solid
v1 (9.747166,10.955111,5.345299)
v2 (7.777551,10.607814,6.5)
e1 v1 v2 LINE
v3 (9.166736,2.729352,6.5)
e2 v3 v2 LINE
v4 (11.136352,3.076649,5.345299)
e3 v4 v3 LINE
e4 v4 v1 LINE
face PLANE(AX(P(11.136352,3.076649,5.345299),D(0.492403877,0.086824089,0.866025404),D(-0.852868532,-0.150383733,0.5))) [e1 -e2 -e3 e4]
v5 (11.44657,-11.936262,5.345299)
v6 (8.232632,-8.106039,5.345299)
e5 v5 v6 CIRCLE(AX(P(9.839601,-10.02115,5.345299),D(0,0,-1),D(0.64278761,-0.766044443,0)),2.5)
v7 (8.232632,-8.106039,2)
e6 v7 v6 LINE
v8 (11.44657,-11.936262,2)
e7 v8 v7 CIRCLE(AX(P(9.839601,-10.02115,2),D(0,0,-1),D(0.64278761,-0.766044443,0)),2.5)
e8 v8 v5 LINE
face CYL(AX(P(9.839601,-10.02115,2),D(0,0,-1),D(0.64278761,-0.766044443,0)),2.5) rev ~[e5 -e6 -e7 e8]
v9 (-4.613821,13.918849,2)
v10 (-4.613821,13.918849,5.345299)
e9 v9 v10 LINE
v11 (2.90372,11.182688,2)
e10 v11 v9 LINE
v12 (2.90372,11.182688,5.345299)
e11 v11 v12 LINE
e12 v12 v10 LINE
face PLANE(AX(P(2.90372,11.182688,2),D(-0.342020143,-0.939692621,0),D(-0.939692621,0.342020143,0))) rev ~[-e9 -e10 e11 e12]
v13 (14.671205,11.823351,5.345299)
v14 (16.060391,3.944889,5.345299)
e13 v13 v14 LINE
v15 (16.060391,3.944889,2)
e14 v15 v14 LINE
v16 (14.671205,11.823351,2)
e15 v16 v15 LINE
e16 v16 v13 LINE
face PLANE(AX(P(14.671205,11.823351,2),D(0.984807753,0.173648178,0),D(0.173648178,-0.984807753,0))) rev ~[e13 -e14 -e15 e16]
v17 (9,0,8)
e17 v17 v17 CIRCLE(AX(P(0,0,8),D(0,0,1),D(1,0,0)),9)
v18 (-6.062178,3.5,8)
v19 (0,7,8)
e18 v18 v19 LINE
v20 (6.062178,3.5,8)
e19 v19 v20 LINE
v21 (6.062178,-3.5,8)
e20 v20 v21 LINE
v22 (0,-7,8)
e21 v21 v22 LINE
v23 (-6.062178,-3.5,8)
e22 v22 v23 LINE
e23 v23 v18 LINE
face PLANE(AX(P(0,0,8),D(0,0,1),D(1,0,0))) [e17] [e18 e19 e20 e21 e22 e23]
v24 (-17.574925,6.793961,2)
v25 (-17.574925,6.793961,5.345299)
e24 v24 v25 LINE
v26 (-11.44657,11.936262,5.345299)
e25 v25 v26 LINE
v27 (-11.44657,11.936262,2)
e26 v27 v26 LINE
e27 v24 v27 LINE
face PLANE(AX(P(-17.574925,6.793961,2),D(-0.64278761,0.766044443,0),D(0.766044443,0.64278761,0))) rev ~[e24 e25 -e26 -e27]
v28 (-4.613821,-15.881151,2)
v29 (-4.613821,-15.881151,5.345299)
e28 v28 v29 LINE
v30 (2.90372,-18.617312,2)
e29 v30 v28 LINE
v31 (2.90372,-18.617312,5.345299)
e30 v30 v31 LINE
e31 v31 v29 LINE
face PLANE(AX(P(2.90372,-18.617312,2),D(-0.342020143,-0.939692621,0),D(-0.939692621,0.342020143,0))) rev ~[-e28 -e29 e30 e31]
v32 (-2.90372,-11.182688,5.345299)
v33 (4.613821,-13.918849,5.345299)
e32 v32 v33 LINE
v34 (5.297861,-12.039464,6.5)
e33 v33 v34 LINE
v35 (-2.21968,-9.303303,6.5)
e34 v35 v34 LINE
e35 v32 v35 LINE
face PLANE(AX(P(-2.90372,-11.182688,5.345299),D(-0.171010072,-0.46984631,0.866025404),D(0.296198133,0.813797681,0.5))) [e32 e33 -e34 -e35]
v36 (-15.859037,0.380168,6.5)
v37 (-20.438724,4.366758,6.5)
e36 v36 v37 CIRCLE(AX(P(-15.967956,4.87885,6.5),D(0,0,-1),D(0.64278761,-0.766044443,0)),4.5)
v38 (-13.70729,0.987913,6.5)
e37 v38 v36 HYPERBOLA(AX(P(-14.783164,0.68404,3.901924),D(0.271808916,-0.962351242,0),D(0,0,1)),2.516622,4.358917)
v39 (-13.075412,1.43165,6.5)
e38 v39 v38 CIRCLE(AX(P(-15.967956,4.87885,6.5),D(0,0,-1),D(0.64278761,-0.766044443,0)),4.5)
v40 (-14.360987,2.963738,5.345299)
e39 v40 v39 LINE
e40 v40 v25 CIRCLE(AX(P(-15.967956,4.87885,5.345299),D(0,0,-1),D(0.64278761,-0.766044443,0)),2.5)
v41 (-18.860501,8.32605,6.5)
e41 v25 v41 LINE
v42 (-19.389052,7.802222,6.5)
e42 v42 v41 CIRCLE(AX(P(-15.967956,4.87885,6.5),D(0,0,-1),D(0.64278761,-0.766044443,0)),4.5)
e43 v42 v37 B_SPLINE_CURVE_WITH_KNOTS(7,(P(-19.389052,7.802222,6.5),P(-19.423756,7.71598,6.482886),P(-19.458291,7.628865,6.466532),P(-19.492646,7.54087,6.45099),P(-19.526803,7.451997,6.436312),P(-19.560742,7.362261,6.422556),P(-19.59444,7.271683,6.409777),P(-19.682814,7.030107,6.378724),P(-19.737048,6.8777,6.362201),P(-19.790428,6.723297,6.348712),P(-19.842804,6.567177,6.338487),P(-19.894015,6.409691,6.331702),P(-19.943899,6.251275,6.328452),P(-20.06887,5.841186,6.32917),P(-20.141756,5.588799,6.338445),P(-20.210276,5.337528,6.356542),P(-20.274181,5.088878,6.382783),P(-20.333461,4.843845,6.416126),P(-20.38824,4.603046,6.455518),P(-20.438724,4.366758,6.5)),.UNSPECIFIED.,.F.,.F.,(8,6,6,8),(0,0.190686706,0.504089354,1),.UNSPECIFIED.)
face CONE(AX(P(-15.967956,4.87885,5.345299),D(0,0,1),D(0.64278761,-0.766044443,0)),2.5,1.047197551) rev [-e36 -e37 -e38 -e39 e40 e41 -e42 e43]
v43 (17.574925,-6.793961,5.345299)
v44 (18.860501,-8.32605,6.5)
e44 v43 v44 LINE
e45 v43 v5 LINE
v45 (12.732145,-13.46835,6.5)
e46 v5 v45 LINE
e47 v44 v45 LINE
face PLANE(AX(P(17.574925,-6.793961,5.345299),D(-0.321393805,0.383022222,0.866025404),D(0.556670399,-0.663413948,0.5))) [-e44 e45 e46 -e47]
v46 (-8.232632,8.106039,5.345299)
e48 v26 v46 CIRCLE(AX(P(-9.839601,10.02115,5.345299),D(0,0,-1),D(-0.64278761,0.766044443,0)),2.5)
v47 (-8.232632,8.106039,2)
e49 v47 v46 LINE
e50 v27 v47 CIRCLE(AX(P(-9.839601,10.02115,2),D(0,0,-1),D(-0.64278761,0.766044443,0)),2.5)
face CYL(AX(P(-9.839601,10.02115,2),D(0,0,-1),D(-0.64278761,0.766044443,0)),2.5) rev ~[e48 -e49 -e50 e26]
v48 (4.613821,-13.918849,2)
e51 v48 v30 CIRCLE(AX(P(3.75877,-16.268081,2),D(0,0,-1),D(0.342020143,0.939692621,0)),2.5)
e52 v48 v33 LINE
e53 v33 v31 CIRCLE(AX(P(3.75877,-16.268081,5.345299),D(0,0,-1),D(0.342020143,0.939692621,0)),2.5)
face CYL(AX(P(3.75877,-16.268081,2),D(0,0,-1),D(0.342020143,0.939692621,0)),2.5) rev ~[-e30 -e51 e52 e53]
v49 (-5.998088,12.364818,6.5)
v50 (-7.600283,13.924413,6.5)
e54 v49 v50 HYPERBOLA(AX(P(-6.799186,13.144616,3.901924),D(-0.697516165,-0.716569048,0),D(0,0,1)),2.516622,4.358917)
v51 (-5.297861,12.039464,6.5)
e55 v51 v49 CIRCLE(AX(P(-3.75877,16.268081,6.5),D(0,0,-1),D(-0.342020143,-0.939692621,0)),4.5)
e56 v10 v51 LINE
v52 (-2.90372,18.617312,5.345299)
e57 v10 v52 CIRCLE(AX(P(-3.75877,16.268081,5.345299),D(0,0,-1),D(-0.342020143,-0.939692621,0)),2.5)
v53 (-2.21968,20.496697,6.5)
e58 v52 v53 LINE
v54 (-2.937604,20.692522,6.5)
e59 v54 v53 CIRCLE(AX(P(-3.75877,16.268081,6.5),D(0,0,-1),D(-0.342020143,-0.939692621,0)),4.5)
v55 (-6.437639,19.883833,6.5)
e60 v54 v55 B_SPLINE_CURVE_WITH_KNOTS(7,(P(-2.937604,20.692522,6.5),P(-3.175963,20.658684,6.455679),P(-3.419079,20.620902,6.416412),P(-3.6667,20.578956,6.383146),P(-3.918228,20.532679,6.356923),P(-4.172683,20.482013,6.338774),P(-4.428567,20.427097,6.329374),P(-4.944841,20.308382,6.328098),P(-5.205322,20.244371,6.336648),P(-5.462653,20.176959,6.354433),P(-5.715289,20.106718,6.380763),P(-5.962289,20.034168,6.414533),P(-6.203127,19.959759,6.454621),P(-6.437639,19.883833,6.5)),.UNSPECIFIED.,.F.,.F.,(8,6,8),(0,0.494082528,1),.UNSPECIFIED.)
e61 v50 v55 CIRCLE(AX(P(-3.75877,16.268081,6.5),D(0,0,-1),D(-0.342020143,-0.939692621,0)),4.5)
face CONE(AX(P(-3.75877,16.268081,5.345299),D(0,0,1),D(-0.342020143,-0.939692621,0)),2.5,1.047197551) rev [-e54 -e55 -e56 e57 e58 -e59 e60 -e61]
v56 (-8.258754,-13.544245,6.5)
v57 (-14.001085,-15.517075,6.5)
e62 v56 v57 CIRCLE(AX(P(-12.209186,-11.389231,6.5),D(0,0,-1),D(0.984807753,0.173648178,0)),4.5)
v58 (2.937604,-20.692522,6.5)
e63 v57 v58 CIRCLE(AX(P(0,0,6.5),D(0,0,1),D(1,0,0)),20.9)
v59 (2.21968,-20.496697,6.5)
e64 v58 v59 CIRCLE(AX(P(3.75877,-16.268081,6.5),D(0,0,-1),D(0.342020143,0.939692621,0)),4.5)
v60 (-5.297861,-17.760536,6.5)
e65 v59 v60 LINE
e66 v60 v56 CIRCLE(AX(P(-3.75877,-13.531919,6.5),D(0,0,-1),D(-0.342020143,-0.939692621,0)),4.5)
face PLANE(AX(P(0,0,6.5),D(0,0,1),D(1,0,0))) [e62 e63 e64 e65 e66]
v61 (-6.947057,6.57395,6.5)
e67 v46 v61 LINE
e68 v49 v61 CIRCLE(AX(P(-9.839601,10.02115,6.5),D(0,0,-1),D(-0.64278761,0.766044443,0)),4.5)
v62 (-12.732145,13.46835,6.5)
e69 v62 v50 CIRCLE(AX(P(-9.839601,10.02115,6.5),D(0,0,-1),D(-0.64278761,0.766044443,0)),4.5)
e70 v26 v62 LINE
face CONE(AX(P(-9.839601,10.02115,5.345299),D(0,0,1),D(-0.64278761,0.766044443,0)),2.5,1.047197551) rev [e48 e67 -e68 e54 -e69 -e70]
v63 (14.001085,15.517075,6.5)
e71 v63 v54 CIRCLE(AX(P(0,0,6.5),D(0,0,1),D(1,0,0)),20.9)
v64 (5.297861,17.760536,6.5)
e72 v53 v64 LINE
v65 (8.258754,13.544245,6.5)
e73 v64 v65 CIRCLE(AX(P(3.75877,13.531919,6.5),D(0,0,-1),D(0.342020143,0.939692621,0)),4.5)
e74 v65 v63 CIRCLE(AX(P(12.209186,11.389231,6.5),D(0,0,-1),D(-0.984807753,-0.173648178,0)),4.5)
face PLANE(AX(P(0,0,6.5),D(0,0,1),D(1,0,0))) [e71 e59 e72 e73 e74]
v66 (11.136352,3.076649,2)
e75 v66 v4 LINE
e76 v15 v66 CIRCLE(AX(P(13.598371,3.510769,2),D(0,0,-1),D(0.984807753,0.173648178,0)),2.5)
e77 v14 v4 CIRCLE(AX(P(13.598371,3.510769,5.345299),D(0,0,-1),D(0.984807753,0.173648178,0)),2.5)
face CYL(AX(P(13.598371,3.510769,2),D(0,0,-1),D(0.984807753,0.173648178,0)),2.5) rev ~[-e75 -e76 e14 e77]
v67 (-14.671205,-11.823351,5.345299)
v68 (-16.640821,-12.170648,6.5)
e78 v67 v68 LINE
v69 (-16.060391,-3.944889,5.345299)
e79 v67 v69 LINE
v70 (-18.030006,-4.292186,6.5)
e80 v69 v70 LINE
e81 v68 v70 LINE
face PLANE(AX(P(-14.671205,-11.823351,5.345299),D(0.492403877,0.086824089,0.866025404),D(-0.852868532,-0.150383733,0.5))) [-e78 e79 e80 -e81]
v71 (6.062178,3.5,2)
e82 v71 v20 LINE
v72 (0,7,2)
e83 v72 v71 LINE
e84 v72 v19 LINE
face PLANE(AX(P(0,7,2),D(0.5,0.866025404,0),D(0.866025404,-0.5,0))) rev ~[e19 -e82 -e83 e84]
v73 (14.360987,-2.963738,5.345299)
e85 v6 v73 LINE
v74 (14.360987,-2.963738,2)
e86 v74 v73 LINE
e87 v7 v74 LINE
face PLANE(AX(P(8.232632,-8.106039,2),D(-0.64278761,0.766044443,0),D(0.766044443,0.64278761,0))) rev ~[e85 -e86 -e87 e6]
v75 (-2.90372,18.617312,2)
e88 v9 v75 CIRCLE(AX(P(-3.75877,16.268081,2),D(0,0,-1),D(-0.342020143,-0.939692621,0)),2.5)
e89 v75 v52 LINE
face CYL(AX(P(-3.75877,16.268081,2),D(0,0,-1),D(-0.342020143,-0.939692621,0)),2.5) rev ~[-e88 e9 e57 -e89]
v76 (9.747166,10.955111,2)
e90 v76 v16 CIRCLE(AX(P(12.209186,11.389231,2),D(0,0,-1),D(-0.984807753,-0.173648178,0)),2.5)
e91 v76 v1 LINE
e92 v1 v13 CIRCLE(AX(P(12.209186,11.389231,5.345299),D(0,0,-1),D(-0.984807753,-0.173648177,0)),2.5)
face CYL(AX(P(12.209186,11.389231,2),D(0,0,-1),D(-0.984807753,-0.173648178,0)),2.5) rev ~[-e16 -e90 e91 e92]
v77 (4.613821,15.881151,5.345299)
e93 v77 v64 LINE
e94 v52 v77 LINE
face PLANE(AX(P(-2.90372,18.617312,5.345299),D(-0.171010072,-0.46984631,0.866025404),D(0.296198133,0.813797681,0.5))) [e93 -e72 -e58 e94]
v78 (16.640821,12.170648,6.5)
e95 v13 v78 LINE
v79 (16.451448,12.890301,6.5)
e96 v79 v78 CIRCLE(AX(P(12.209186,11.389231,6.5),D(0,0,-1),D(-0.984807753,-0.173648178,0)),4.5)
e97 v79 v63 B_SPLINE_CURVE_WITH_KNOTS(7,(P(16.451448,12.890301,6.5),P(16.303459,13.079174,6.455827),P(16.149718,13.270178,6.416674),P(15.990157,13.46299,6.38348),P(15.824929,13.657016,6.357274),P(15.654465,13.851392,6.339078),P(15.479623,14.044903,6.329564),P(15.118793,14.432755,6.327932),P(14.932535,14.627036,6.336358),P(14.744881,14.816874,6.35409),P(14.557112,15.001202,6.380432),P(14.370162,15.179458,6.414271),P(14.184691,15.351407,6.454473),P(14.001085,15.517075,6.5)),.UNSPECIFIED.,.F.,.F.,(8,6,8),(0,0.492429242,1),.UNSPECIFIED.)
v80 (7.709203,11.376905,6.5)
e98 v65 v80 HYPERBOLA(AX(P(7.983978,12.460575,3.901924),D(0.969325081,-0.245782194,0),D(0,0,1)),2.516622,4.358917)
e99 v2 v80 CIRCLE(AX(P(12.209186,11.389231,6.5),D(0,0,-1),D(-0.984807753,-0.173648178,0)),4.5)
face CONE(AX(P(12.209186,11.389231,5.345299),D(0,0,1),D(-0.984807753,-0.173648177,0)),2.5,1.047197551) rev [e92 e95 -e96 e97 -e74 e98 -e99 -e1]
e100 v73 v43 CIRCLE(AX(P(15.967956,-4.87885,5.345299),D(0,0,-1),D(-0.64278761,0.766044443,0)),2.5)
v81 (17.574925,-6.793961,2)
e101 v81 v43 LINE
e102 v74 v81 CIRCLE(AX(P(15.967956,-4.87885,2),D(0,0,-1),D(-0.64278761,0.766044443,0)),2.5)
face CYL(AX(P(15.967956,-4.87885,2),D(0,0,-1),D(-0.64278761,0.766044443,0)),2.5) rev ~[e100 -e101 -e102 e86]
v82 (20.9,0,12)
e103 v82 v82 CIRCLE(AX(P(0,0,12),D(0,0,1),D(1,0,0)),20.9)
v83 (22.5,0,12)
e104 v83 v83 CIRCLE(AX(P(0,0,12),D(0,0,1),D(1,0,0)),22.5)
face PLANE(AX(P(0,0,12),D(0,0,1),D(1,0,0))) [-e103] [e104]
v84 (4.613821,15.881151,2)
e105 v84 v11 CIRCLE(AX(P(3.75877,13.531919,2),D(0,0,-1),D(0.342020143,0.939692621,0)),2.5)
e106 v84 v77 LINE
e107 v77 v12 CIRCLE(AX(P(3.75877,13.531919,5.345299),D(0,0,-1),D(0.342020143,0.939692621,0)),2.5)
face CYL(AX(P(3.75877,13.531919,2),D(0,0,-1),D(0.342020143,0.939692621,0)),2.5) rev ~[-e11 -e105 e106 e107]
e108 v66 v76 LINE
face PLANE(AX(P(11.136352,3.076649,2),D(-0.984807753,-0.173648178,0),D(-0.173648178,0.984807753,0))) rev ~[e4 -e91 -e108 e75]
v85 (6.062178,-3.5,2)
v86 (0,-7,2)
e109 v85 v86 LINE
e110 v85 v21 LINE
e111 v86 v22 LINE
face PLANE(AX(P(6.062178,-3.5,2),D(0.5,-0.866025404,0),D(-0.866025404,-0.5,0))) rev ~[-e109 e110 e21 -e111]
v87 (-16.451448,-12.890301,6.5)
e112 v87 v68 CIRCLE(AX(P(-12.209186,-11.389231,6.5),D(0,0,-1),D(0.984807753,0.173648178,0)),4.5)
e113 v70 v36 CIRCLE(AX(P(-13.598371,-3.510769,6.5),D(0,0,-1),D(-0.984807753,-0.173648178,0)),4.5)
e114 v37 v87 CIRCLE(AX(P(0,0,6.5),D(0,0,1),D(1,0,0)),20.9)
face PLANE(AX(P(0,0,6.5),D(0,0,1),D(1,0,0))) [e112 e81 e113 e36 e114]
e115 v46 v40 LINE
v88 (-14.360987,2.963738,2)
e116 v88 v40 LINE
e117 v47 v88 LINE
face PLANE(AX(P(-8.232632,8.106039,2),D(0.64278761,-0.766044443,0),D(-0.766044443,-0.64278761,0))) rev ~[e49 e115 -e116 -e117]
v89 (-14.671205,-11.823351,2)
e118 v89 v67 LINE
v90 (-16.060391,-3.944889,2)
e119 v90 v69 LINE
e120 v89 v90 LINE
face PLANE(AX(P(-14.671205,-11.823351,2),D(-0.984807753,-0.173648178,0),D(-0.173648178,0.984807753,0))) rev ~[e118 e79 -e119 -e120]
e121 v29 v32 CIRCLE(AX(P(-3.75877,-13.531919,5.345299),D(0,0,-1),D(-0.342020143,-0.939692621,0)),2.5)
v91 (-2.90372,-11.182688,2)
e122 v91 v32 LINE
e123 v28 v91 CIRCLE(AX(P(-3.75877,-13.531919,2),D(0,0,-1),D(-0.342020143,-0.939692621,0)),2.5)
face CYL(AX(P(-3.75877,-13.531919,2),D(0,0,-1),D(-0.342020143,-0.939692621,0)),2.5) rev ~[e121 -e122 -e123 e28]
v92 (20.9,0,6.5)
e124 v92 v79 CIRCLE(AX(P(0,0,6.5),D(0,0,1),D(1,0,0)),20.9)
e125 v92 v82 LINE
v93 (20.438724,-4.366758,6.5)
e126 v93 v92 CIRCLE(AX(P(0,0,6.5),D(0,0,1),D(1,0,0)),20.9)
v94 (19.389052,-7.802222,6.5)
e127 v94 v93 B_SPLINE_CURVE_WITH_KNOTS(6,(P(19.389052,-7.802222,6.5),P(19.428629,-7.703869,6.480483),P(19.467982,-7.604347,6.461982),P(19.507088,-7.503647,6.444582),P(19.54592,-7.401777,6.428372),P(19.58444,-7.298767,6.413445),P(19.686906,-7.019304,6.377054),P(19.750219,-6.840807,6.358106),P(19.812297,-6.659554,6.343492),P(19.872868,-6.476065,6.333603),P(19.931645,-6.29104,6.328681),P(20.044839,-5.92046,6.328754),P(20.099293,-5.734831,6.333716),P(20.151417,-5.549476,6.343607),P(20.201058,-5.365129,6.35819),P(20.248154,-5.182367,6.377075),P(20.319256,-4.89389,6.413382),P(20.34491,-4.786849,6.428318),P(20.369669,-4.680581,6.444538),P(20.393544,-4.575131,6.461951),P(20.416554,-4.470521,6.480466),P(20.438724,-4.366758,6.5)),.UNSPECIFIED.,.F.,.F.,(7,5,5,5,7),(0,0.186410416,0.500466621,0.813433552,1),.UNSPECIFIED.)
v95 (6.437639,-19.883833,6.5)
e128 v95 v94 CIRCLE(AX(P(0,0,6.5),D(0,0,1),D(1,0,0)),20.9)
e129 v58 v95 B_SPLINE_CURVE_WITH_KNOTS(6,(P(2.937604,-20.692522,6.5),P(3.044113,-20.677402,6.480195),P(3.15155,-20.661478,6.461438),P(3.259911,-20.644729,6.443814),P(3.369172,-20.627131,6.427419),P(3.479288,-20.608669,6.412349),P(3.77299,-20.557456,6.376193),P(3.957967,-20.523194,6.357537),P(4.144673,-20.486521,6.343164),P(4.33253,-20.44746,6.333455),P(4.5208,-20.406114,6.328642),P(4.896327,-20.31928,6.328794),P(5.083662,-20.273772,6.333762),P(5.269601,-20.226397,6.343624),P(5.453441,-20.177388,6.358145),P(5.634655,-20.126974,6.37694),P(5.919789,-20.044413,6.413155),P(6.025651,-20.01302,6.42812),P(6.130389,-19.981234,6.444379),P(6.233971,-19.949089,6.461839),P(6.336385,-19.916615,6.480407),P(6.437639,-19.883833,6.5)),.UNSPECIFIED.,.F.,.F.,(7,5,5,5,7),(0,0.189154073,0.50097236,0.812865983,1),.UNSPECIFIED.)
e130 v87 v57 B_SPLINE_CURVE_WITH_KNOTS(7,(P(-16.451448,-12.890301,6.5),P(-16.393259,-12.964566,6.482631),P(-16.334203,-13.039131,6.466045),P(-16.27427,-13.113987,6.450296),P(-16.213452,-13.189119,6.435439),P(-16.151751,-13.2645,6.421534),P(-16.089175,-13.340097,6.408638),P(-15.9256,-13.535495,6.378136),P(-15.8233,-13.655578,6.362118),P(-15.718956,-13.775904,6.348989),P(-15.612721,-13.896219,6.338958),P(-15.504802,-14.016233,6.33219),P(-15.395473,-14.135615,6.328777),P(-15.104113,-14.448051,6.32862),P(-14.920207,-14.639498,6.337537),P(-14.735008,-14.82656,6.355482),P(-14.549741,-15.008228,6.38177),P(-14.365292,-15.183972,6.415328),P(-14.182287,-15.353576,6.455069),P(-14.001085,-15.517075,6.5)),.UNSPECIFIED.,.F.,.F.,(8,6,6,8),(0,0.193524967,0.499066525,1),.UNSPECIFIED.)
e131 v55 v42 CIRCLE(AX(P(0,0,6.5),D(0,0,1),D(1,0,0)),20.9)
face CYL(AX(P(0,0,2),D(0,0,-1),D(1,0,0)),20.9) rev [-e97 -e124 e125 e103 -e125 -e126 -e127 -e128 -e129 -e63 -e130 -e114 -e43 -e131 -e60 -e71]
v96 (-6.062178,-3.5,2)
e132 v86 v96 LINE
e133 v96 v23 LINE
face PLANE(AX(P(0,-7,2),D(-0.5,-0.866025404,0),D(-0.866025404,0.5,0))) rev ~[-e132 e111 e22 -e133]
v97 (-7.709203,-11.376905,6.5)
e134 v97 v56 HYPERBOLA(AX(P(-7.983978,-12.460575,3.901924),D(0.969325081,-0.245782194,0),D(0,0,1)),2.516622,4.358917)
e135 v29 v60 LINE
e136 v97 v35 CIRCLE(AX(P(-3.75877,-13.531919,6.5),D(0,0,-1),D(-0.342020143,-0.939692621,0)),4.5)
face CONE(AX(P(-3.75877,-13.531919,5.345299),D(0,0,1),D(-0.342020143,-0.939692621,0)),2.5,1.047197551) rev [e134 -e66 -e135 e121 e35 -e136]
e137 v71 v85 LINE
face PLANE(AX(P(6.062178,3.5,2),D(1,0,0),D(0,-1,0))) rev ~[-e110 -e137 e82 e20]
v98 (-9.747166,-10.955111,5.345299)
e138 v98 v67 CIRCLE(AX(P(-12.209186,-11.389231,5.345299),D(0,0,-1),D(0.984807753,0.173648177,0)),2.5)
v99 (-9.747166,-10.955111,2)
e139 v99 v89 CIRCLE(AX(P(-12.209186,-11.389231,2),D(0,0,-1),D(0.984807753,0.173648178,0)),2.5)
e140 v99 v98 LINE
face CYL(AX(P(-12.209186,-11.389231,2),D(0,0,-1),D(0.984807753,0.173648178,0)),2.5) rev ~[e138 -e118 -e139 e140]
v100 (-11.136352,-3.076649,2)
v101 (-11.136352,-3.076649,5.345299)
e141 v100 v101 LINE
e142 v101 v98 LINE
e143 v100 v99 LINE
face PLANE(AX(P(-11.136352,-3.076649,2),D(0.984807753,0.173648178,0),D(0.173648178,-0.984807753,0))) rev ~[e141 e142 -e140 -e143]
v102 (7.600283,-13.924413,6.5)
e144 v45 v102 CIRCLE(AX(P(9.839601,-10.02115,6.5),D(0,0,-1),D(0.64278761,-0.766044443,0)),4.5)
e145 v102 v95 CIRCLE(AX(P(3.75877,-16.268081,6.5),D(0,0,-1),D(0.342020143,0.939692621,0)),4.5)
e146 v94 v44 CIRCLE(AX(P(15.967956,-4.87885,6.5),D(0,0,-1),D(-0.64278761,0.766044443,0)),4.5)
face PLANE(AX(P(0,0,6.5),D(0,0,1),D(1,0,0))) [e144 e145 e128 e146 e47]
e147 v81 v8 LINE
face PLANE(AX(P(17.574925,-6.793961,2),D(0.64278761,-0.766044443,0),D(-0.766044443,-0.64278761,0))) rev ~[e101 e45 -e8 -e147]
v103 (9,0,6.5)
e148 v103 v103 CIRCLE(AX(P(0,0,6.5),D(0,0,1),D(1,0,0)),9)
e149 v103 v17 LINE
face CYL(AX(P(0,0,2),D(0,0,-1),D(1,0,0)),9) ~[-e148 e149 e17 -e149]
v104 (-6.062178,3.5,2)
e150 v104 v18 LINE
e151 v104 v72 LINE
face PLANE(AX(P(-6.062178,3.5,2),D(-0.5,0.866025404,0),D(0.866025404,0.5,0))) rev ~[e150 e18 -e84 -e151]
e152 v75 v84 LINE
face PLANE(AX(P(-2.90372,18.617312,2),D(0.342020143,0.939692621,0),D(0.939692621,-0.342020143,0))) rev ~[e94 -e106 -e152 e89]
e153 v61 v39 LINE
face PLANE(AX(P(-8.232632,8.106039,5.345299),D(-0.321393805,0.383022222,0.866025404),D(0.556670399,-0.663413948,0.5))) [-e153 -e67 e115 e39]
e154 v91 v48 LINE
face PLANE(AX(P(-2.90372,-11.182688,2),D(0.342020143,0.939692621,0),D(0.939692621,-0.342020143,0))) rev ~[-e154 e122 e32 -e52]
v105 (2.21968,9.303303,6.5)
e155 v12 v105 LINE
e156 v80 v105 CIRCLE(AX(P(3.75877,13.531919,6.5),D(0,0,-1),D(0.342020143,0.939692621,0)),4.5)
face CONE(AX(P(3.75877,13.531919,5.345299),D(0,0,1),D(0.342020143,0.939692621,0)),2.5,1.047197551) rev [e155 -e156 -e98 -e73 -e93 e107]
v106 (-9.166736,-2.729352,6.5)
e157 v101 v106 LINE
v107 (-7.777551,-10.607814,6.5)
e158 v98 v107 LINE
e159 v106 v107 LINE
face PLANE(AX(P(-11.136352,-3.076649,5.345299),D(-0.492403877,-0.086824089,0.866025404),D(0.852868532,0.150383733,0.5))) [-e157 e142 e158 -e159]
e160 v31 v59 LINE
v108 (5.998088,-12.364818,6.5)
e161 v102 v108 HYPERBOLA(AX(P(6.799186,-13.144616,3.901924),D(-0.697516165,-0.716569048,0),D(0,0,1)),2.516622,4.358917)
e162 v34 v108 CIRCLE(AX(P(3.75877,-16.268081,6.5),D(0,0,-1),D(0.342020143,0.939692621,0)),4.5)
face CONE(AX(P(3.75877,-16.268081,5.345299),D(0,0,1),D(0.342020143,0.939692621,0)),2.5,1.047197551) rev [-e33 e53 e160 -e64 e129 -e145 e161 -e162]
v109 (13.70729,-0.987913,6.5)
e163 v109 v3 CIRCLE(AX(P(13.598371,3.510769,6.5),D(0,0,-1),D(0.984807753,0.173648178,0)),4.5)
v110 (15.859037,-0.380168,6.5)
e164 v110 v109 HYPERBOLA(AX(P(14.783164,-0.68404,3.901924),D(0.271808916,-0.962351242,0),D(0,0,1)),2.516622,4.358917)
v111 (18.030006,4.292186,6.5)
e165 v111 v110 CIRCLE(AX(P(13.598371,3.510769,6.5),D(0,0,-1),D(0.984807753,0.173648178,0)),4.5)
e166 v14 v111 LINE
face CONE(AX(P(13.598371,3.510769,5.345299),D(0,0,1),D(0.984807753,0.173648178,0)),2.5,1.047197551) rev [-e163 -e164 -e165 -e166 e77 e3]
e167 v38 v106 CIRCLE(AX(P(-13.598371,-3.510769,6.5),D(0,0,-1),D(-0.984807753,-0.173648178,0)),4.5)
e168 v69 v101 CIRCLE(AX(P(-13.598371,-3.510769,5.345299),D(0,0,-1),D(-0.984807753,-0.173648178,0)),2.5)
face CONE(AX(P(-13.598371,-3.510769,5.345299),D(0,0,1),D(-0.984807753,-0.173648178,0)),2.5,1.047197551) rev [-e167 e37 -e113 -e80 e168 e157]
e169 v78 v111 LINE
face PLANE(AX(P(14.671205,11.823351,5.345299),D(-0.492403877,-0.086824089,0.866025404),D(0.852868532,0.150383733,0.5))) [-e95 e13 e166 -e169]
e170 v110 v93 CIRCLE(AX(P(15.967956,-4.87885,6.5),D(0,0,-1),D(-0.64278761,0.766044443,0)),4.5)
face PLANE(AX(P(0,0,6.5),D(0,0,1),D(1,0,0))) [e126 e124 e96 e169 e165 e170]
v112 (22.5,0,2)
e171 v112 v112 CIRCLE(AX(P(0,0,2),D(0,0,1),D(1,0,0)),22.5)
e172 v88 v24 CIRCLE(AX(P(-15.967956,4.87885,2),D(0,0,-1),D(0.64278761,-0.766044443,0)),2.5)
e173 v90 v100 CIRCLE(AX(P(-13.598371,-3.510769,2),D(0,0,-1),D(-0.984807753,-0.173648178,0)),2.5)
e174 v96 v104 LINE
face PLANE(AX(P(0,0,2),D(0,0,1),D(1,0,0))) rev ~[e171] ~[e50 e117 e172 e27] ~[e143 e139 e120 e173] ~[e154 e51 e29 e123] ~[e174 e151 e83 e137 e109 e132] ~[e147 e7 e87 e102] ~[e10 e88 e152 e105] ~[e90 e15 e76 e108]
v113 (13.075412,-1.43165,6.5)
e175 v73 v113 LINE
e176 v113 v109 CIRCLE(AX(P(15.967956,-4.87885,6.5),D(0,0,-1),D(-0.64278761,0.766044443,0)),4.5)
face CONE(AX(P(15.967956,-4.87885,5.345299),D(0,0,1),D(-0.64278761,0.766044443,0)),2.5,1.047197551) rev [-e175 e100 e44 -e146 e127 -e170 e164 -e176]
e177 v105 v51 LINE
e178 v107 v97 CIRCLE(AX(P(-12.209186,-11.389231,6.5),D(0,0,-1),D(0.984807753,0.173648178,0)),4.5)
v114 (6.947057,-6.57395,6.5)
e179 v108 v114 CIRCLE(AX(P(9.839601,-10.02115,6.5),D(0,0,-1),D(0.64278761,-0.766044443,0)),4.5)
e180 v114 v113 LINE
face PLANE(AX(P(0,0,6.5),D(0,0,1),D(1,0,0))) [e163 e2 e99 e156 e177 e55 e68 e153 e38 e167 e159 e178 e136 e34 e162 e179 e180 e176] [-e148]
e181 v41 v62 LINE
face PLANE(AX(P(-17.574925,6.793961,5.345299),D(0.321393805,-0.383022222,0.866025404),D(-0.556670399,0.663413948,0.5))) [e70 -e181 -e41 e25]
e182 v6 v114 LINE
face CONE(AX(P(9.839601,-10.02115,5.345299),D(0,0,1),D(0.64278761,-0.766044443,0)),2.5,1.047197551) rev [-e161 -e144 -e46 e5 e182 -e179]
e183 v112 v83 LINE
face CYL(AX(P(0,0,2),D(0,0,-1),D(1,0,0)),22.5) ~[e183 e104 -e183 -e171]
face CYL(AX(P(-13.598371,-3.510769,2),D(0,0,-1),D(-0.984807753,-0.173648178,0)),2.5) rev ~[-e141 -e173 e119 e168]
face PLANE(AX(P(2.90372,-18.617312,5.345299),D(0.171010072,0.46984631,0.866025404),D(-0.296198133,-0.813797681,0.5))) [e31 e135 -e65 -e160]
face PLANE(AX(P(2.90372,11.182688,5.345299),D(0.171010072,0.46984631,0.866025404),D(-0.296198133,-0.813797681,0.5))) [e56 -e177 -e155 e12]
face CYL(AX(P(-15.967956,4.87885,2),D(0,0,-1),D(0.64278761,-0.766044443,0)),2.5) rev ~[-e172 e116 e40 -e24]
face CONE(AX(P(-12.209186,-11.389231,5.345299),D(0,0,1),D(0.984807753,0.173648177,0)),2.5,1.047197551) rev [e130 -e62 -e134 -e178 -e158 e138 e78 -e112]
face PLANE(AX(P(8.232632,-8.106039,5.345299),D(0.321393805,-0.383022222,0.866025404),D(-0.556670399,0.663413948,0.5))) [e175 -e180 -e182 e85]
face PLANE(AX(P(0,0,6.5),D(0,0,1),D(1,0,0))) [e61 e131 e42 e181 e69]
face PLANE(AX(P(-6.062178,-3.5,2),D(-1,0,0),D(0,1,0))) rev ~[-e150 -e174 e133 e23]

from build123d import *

# Parameters (mm, degrees)
F1_START     = 2
F0_R         = 20.9
F0_R_2       = 9
F1_DEPTH     = 4.5
F2_START     = 2
F0_R_3       = 8
F2_DEPTH     = 6
F3_START     = 2
F3_DEPTH     = 6
F4_START     = 2
F0_R_4       = 22.5
F4_DEPTH     = 10
F5_T1_DEPTH  = 8
F5_T3_DEPTH  = 8
F5_T5_DEPTH  = 8
F5_T7_DEPTH  = 8
F5_T9_DEPTH  = 8
F5_T11_DEPTH = 8
F5_T13_DEPTH = 8
F5_T15_DEPTH = 8
F5_T17_DEPTH = 8
F5_T19_DEPTH = 8
F5_T21_DEPTH = 8
F5_T23_DEPTH = 8
F5_T26_ANGLE = 180
F5_T30_ANGLE = 180
F5_S31_R     = 20.9
F5_T32_DEPTH = 7
F5_T34_ANGLE = 180
F5_T38_ANGLE = 180
F5_S39_R     = 20.9
F5_T40_DEPTH = 7
F5_T44_ANGLE = 180
F5_S45_R     = 20.9
F5_T46_DEPTH = 7
F5_T48_ANGLE = 180
F5_T52_ANGLE = 180
F5_S53_R     = 20.9
F5_T54_DEPTH = 7
F5_T56_ANGLE = 180
F5_T60_ANGLE = 180
F5_S61_R     = 20.9
F5_T62_DEPTH = 7
F5_T64_ANGLE = 180
F5_T66_ANGLE = 180
F5_T70_ANGLE = 180
F5_S71_R     = 20.9
F5_T72_DEPTH = 7


# Not quite as in the source:
# - a fillet or chamfer that OpenCascade refuses, or shapes differently, is made with other operations: its cross-section is extruded or revolved along the edge and cut away or added
# - a feature names something its author has since deleted; it is built from what else it names


with BuildPart() as f1:
    # F0 (on Top) → F1 (new body)
    with BuildSketch(Plane.XY.offset(F1_START)):
        Circle(F0_R)
        with BuildLine():
            ThreePointArc((4.6138208415, -13.9188490213), (6.1080020351, -17.1231309316), (2.9037201248, -18.6173121253))
            Line((2.9037201248, -18.6173121253), (-4.6138208415, -15.8811509787))
            ThreePointArc((-4.6138208415, -15.8811509787), (-6.1080020351, -12.6768690684), (-2.9037201248, -11.1826878747))
            Line((-2.9037201248, -11.1826878747), (4.6138208415, -13.9188490213))
        make_face(mode=Mode.SUBTRACT)
        with BuildLine():
            ThreePointArc((-9.7471664232, -10.9551105679), (-11.7750653616, -13.8512503946), (-14.6712051883, -11.8233514562))
            Line((-14.6712051883, -11.8233514562), (-16.0603906096, -3.9448894321))
            ThreePointArc((-16.0603906096, -3.9448894321), (-14.0324916712, -1.0487496054), (-11.1363518445, -3.0766485438))
            Line((-11.1363518445, -3.0766485438), (-9.7471664232, -10.9551105679))
        make_face(mode=Mode.SUBTRACT)
        with BuildLine():
            ThreePointArc((14.3609872646, -2.9637384535), (17.8830673967, -3.271880537), (17.5749253131, -6.7939606691))
            Line((17.5749253131, -6.7939606691), (11.4465697681, -11.9362615465))
            ThreePointArc((11.4465697681, -11.9362615465), (7.9244896361, -11.628119463), (8.2326317197, -8.1060393309))
            Line((8.2326317197, -8.1060393309), (14.3609872646, -2.9637384535))
        make_face(mode=Mode.SUBTRACT)
        with BuildLine():
            ThreePointArc((-14.3609872646, 2.9637384535), (-17.8830673967, 3.271880537), (-17.5749253131, 6.7939606691))
            Line((-17.5749253131, 6.7939606691), (-11.4465697681, 11.9362615465))
            ThreePointArc((-11.4465697681, 11.9362615465), (-7.9244896361, 11.628119463), (-8.2326317197, 8.1060393309))
            Line((-8.2326317197, 8.1060393309), (-14.3609872646, 2.9637384535))
        make_face(mode=Mode.SUBTRACT)
        Circle(F0_R_2, mode=Mode.SUBTRACT)
        with BuildLine():
            ThreePointArc((9.7471664232, 10.9551105679), (11.7750653616, 13.8512503946), (14.6712051883, 11.8233514562))
            Line((14.6712051883, 11.8233514562), (16.0603906096, 3.9448894321))
            ThreePointArc((16.0603906096, 3.9448894321), (14.0324916712, 1.0487496054), (11.1363518445, 3.0766485438))
            Line((11.1363518445, 3.0766485438), (9.7471664232, 10.9551105679))
        make_face(mode=Mode.SUBTRACT)
        with BuildLine():
            ThreePointArc((-4.6138208415, 13.9188490213), (-6.1080020351, 17.1231309316), (-2.9037201248, 18.6173121253))
            Line((-2.9037201248, 18.6173121253), (4.6138208415, 15.8811509787))
            ThreePointArc((4.6138208415, 15.8811509787), (6.1080020351, 12.6768690684), (2.9037201248, 11.1826878747))
            Line((2.9037201248, 11.1826878747), (-4.6138208415, 13.9188490213))
        make_face(mode=Mode.SUBTRACT)
    extrude(amount=F1_DEPTH)

    # F0 (on Top) → F2 (join)
    with BuildSketch(Plane.XY.offset(F2_START)):
        Circle(F0_R_2)
        Circle(F0_R_3, mode=Mode.SUBTRACT)
    extrude(amount=F2_DEPTH)

    # F0 (on Top) → F3 (join)
    with BuildSketch(Plane.XY.offset(F3_START)):
        Circle(F0_R_3)
        with BuildLine():
            ThreePointArc((6.0621778265, 3.5), (6.761480784, 1.8117333157), (7, 0))
            ThreePointArc((7, 0), (6.761480784, -1.8117333157), (6.0621778265, -3.5))
            ThreePointArc((6.0621778265, -3.5), (3.5, -6.0621778265), (0, -7))
            ThreePointArc((0, -7), (-3.5, -6.0621778265), (-6.0621778265, -3.5))
            ThreePointArc((-6.0621778265, -3.5), (-7, 0), (-6.0621778265, 3.5))
            ThreePointArc((-6.0621778265, 3.5), (-3.5, 6.0621778265), (0, 7))
            ThreePointArc((0, 7), (3.5, 6.0621778265), (6.0621778265, 3.5))
        make_face(mode=Mode.SUBTRACT)
        with BuildLine():
            Line((-6.0621778265, -3.5), (-6.0621778265, 3.5))
            ThreePointArc((-6.0621778265, 3.5), (-7, 0), (-6.0621778265, -3.5))
        make_face()
        with BuildLine():
            Line((-6.0621778265, 3.5), (0, 7))
            ThreePointArc((0, 7), (-3.5, 6.0621778265), (-6.0621778265, 3.5))
        make_face()
        with BuildLine():
            Line((0, 7), (6.0621778265, 3.5))
            ThreePointArc((6.0621778265, 3.5), (3.5, 6.0621778265), (0, 7))
        make_face()
        with BuildLine():
            ThreePointArc((6.0621778265, -3.5), (6.761480784, -1.8117333157), (7, 0))
            ThreePointArc((7, 0), (6.761480784, 1.8117333157), (6.0621778265, 3.5))
            Line((6.0621778265, 3.5), (6.0621778265, -3.5))
        make_face()
        with BuildLine():
            ThreePointArc((0, -7), (3.5, -6.0621778265), (6.0621778265, -3.5))
            Line((6.0621778265, -3.5), (0, -7))
        make_face()
        with BuildLine():
            ThreePointArc((-6.0621778265, -3.5), (-3.5, -6.0621778265), (0, -7))
            Line((0, -7), (-6.0621778265, -3.5))
        make_face()
    extrude(amount=F3_DEPTH)

    # F0 (on Top) → F4 (join)
    with BuildSketch(Plane.XY.offset(F4_START)):
        Circle(F0_R_4)
        Circle(F0_R, mode=Mode.SUBTRACT)
    extrude(amount=F4_DEPTH)

    # F5: chamfer of 2 x 1.1547005384 on 24 edges, made by hand

    # F5_s2 → F5_t1 (cut)
    with BuildSketch(Plane(origin=(1.029997209, -0.3748883255, 0), x_dir=(0, 0, 1), z_dir=(0.9396926208, -0.3420201433, 0))):
        Polygon((5.3452994616, 11.5014200497), (6.5, 9.5014200497), (6.5, 11.5014200497), align=None)
    extrude(amount=F5_T1_DEPTH, mode=Mode.SUBTRACT)

    # F5_s4 → F5_t3 (cut)
    with BuildSketch(Plane(origin=(-1.029997209, 0.3748883255, 0), x_dir=(0, 0, 1), z_dir=(-0.9396926208, 0.3420201433, 0))):
        Polygon((5.3452994616, 11.5014200497), (6.5, 9.5014200497), (6.5, 11.5014200497), align=None)
    extrude(amount=F5_T3_DEPTH, mode=Mode.SUBTRACT)

    # F5_s6 → F5_t5 (cut)
    with BuildSketch(Plane(origin=(-0.1903357911, 1.0794479116, 0), x_dir=(0, 0, 1), z_dir=(-0.1736481777, 0.984807753, 0))):
        Polygon((5.3452994616, 11.5014200497), (6.5, 9.5014200497), (6.5, 11.5014200497), align=None)
    extrude(amount=F5_T5_DEPTH, mode=Mode.SUBTRACT)

    # F5_s8 → F5_t7 (cut)
    with BuildSketch(Plane(origin=(0.8396614179, 0.7045595861, 0), x_dir=(0, 0, 1), z_dir=(0.7660444431, 0.6427876097, 0))):
        Polygon((5.3452994616, 11.5014200497), (6.5, 9.5014200497), (6.5, 11.5014200497), align=None)
    extrude(amount=F5_T7_DEPTH, mode=Mode.SUBTRACT)

    # F5_s10 → F5_t9 (cut)
    with BuildSketch(Plane(origin=(-0.8396614179, -0.7045595861, 0), x_dir=(0, 0, 1), z_dir=(-0.7660444431, -0.6427876097, 0))):
        Polygon((5.3452994616, 11.5014200497), (6.5, 9.5014200497), (6.5, 11.5014200497), align=None)
    extrude(amount=F5_T9_DEPTH, mode=Mode.SUBTRACT)

    # F5_s12 → F5_t11 (cut)
    with BuildSketch(Plane(origin=(0.1903357911, -1.0794479116, 0), x_dir=(0, 0, 1), z_dir=(0.1736481777, -0.984807753, 0))):
        Polygon((5.3452994616, 11.5014200497), (6.5, 9.5014200497), (6.5, 11.5014200497), align=None)
    extrude(amount=F5_T11_DEPTH, mode=Mode.SUBTRACT)

    # F5_s14 → F5_t13 (cut)
    with BuildSketch(Plane(origin=(8.5475381753, -3.1110494721, 0), x_dir=(0, 0, 1), z_dir=(-0.9396926208, 0.3420201433, 0))):
        Polygon((5.3452994616, -16.5014200497), (6.5, -18.5014200497), (6.5, -16.5014200497), align=None)
    extrude(amount=F5_T13_DEPTH, mode=Mode.SUBTRACT)

    # F5_s16 → F5_t15 (cut)
    with BuildSketch(Plane(origin=(1.5795212124, -8.9579099357, 0), x_dir=(0, 0, 1), z_dir=(-0.1736481777, 0.984807753, 0))):
        Polygon((5.3452994616, -16.5014200497), (6.5, -18.5014200497), (6.5, -16.5014200497), align=None)
    extrude(amount=F5_T15_DEPTH, mode=Mode.SUBTRACT)

    # F5_s18 → F5_t17 (cut)
    with BuildSketch(Plane(origin=(6.9680169629, 5.8468604636, 0), x_dir=(0, 0, 1), z_dir=(-0.7660444431, -0.6427876097, 0))):
        Polygon((5.3452994616, -16.5014200497), (6.5, -18.5014200497), (6.5, -16.5014200497), align=None)
    extrude(amount=F5_T17_DEPTH, mode=Mode.SUBTRACT)

    # F5_s20 → F5_t19 (cut)
    with BuildSketch(Plane(origin=(-6.9680169629, -5.8468604636, 0), x_dir=(0, 0, 1), z_dir=(0.7660444431, 0.6427876097, 0))):
        Polygon((5.3452994616, -16.5014200497), (6.5, -18.5014200497), (6.5, -16.5014200497), align=None)
    extrude(amount=F5_T19_DEPTH, mode=Mode.SUBTRACT)

    # F5_s22 → F5_t21 (cut)
    with BuildSketch(Plane(origin=(-1.5795212124, 8.9579099357, 0), x_dir=(0, 0, 1), z_dir=(0.1736481777, -0.984807753, 0))):
        Polygon((5.3452994616, -16.5014200497), (6.5, -18.5014200497), (6.5, -16.5014200497), align=None)
    extrude(amount=F5_T21_DEPTH, mode=Mode.SUBTRACT)

    # F5_s24 → F5_t23 (cut)
    with BuildSketch(Plane(origin=(-8.5475381753, 3.1110494721, 0), x_dir=(0, 0, 1), z_dir=(0.9396926208, -0.3420201433, 0))):
        Polygon((5.3452994616, -16.5014200497), (6.5, -18.5014200497), (6.5, -16.5014200497), align=None)
    extrude(amount=F5_T23_DEPTH, mode=Mode.SUBTRACT)

    # F5_s25 → F5_t26 (revolve, cut)
    with BuildSketch(Plane(origin=(1.029997209, -0.3748883255, 0), x_dir=(0, 0, 1), z_dir=(0.9396926208, -0.3420201433, 0))):
        Polygon((5.3452994616, 16.5014200497), (6.5, 18.5014200497), (6.5, 16.5014200497), align=None)
    revolve(axis=Axis((-3.7587704831, -13.5319194267, 6.5), (0, 0, -1)), revolution_arc=F5_T26_ANGLE, mode=Mode.SUBTRACT)


with BuildPart() as f5_tool28:
    # F5_s29 → F5_t30 (revolve)
    with BuildSketch(Plane(origin=(8.5475381753, -3.1110494721, 0), x_dir=(0, 0, 1), z_dir=(-0.9396926208, 0.3420201433, 0))):
        Polygon((5.3452994616, -11.5014200497), (6.5, -9.5014200497), (6.5, -11.5014200497), align=None)
    revolve(axis=Axis((3.7587704831, -16.2680805733, 6.5), (0, 0, -1)), revolution_arc=F5_T30_ANGLE)

    # F5_s31 → F5_t32 (intersect, symmetric)
    with BuildSketch(Plane.XY.offset(5.9)):
        Circle(F5_S31_R)
    extrude(amount=F5_T32_DEPTH, both=True, mode=Mode.INTERSECT)


with BuildPart() as f1_1:
    add(f1.part)

    # F5_t27: cut F5_tool28
    add(f5_tool28.part, mode=Mode.SUBTRACT)

    # F5_s33 → F5_t34 (revolve, cut)
    with BuildSketch(Plane(origin=(0.1903357911, -1.0794479116, 0), x_dir=(0, 0, 1), z_dir=(0.1736481777, -0.984807753, 0))):
        Polygon((5.3452994616, 16.5014200497), (6.5, 18.5014200497), (6.5, 16.5014200497), align=None)
    revolve(axis=Axis((-13.5983712271, -3.510768988, 6.5), (0, 0, -1)), revolution_arc=F5_T34_ANGLE, mode=Mode.SUBTRACT)


with BuildPart() as f5_tool36:
    # F5_s37 → F5_t38 (revolve)
    with BuildSketch(Plane(origin=(1.5795212124, -8.9579099357, 0), x_dir=(0, 0, 1), z_dir=(-0.1736481777, 0.984807753, 0))):
        Polygon((5.3452994616, -11.5014200497), (6.5, -9.5014200497), (6.5, -11.5014200497), align=None)
    revolve(axis=Axis((-12.2091858057, -11.389231012, 6.5), (0, 0, -1)), revolution_arc=F5_T38_ANGLE)

    # F5_s39 → F5_t40 (intersect, symmetric)
    with BuildSketch(Plane.XY.offset(5.9)):
        Circle(F5_S39_R)
    extrude(amount=F5_T40_DEPTH, both=True, mode=Mode.INTERSECT)


with BuildPart() as f1_2:
    add(f1_1.part)

    # F5_t35: cut F5_tool36
    add(f5_tool36.part, mode=Mode.SUBTRACT)


with BuildPart() as f5_tool42:
    # F5_s43 → F5_t44 (revolve)
    with BuildSketch(Plane(origin=(6.9680169629, 5.8468604636, 0), x_dir=(0, 0, 1), z_dir=(-0.7660444431, -0.6427876097, 0))):
        Polygon((5.3452994616, -11.5014200497), (6.5, -9.5014200497), (6.5, -11.5014200497), align=None)
    revolve(axis=Axis((15.9679562889, -4.8788495613, 6.5), (0, 0, -1)), revolution_arc=F5_T44_ANGLE)

    # F5_s45 → F5_t46 (intersect, symmetric)
    with BuildSketch(Plane.XY.offset(5.9)):
        Circle(F5_S45_R)
    extrude(amount=F5_T46_DEPTH, both=True, mode=Mode.INTERSECT)


with BuildPart() as f1_3:
    add(f1_2.part)

    # F5_t41: cut F5_tool42
    add(f5_tool42.part, mode=Mode.SUBTRACT)

    # F5_s47 → F5_t48 (revolve, cut)
    with BuildSketch(Plane(origin=(0.8396614179, 0.7045595861, 0), x_dir=(0, 0, 1), z_dir=(0.7660444431, 0.6427876097, 0))):
        Polygon((5.3452994616, 16.5014200497), (6.5, 18.5014200497), (6.5, 16.5014200497), align=None)
    revolve(axis=Axis((9.8396007439, -10.0211504387, 6.5), (0, 0, -1)), revolution_arc=F5_T48_ANGLE, mode=Mode.SUBTRACT)


with BuildPart() as f5_tool50:
    # F5_s51 → F5_t52 (revolve)
    with BuildSketch(Plane(origin=(-6.9680169629, -5.8468604636, 0), x_dir=(0, 0, 1), z_dir=(0.7660444431, 0.6427876097, 0))):
        Polygon((5.3452994616, -11.5014200497), (6.5, -9.5014200497), (6.5, -11.5014200497), align=None)
    revolve(axis=Axis((-15.9679562889, 4.8788495613, 6.5), (0, 0, -1)), revolution_arc=F5_T52_ANGLE)

    # F5_s53 → F5_t54 (intersect, symmetric)
    with BuildSketch(Plane.XY.offset(5.9)):
        Circle(F5_S53_R)
    extrude(amount=F5_T54_DEPTH, both=True, mode=Mode.INTERSECT)


with BuildPart() as f1_4:
    add(f1_3.part)

    # F5_t49: cut F5_tool50
    add(f5_tool50.part, mode=Mode.SUBTRACT)

    # F5_s55 → F5_t56 (revolve, cut)
    with BuildSketch(Plane(origin=(-0.8396614179, -0.7045595861, 0), x_dir=(0, 0, 1), z_dir=(-0.7660444431, -0.6427876097, 0))):
        Polygon((5.3452994616, 16.5014200497), (6.5, 18.5014200497), (6.5, 16.5014200497), align=None)
    revolve(axis=Axis((-9.8396007439, 10.0211504387, 6.5), (0, 0, -1)), revolution_arc=F5_T56_ANGLE, mode=Mode.SUBTRACT)


with BuildPart() as f5_tool58:
    # F5_s59 → F5_t60 (revolve)
    with BuildSketch(Plane(origin=(-1.5795212124, 8.9579099357, 0), x_dir=(0, 0, 1), z_dir=(0.1736481777, -0.984807753, 0))):
        Polygon((5.3452994616, -11.5014200497), (6.5, -9.5014200497), (6.5, -11.5014200497), align=None)
    revolve(axis=Axis((12.2091858057, 11.389231012, 6.5), (0, 0, -1)), revolution_arc=F5_T60_ANGLE)

    # F5_s61 → F5_t62 (intersect, symmetric)
    with BuildSketch(Plane.XY.offset(5.9)):
        Circle(F5_S61_R)
    extrude(amount=F5_T62_DEPTH, both=True, mode=Mode.INTERSECT)


with BuildPart() as f1_5:
    add(f1_4.part)

    # F5_t57: cut F5_tool58
    add(f5_tool58.part, mode=Mode.SUBTRACT)

    # F5_s63 → F5_t64 (revolve, cut)
    with BuildSketch(Plane(origin=(-0.1903357911, 1.0794479116, 0), x_dir=(0, 0, 1), z_dir=(-0.1736481777, 0.984807753, 0))):
        Polygon((5.3452994616, 16.5014200497), (6.5, 18.5014200497), (6.5, 16.5014200497), align=None)
    revolve(axis=Axis((13.5983712271, 3.510768988, 6.5), (0, 0, -1)), revolution_arc=F5_T64_ANGLE, mode=Mode.SUBTRACT)

    # F5_s65 → F5_t66 (revolve, cut)
    with BuildSketch(Plane(origin=(-1.029997209, 0.3748883255, 0), x_dir=(0, 0, 1), z_dir=(-0.9396926208, 0.3420201433, 0))):
        Polygon((5.3452994616, 16.5014200497), (6.5, 18.5014200497), (6.5, 16.5014200497), align=None)
    revolve(axis=Axis((3.7587704831, 13.5319194267, 6.5), (0, 0, -1)), revolution_arc=F5_T66_ANGLE, mode=Mode.SUBTRACT)


with BuildPart() as f5_tool68:
    # F5_s69 → F5_t70 (revolve)
    with BuildSketch(Plane(origin=(-8.5475381753, 3.1110494721, 0), x_dir=(0, 0, 1), z_dir=(0.9396926208, -0.3420201433, 0))):
        Polygon((5.3452994616, -11.5014200497), (6.5, -9.5014200497), (6.5, -11.5014200497), align=None)
    revolve(axis=Axis((-3.7587704831, 16.2680805733, 6.5), (0, 0, -1)), revolution_arc=F5_T70_ANGLE)

    # F5_s71 → F5_t72 (intersect, symmetric)
    with BuildSketch(Plane.XY.offset(5.9)):
        Circle(F5_S71_R)
    extrude(amount=F5_T72_DEPTH, both=True, mode=Mode.INTERSECT)


with BuildPart() as f1_6:
    add(f1_5.part)

    # F5_t67: cut F5_tool68
    add(f5_tool68.part, mode=Mode.SUBTRACT)


solid = f1_6.part
